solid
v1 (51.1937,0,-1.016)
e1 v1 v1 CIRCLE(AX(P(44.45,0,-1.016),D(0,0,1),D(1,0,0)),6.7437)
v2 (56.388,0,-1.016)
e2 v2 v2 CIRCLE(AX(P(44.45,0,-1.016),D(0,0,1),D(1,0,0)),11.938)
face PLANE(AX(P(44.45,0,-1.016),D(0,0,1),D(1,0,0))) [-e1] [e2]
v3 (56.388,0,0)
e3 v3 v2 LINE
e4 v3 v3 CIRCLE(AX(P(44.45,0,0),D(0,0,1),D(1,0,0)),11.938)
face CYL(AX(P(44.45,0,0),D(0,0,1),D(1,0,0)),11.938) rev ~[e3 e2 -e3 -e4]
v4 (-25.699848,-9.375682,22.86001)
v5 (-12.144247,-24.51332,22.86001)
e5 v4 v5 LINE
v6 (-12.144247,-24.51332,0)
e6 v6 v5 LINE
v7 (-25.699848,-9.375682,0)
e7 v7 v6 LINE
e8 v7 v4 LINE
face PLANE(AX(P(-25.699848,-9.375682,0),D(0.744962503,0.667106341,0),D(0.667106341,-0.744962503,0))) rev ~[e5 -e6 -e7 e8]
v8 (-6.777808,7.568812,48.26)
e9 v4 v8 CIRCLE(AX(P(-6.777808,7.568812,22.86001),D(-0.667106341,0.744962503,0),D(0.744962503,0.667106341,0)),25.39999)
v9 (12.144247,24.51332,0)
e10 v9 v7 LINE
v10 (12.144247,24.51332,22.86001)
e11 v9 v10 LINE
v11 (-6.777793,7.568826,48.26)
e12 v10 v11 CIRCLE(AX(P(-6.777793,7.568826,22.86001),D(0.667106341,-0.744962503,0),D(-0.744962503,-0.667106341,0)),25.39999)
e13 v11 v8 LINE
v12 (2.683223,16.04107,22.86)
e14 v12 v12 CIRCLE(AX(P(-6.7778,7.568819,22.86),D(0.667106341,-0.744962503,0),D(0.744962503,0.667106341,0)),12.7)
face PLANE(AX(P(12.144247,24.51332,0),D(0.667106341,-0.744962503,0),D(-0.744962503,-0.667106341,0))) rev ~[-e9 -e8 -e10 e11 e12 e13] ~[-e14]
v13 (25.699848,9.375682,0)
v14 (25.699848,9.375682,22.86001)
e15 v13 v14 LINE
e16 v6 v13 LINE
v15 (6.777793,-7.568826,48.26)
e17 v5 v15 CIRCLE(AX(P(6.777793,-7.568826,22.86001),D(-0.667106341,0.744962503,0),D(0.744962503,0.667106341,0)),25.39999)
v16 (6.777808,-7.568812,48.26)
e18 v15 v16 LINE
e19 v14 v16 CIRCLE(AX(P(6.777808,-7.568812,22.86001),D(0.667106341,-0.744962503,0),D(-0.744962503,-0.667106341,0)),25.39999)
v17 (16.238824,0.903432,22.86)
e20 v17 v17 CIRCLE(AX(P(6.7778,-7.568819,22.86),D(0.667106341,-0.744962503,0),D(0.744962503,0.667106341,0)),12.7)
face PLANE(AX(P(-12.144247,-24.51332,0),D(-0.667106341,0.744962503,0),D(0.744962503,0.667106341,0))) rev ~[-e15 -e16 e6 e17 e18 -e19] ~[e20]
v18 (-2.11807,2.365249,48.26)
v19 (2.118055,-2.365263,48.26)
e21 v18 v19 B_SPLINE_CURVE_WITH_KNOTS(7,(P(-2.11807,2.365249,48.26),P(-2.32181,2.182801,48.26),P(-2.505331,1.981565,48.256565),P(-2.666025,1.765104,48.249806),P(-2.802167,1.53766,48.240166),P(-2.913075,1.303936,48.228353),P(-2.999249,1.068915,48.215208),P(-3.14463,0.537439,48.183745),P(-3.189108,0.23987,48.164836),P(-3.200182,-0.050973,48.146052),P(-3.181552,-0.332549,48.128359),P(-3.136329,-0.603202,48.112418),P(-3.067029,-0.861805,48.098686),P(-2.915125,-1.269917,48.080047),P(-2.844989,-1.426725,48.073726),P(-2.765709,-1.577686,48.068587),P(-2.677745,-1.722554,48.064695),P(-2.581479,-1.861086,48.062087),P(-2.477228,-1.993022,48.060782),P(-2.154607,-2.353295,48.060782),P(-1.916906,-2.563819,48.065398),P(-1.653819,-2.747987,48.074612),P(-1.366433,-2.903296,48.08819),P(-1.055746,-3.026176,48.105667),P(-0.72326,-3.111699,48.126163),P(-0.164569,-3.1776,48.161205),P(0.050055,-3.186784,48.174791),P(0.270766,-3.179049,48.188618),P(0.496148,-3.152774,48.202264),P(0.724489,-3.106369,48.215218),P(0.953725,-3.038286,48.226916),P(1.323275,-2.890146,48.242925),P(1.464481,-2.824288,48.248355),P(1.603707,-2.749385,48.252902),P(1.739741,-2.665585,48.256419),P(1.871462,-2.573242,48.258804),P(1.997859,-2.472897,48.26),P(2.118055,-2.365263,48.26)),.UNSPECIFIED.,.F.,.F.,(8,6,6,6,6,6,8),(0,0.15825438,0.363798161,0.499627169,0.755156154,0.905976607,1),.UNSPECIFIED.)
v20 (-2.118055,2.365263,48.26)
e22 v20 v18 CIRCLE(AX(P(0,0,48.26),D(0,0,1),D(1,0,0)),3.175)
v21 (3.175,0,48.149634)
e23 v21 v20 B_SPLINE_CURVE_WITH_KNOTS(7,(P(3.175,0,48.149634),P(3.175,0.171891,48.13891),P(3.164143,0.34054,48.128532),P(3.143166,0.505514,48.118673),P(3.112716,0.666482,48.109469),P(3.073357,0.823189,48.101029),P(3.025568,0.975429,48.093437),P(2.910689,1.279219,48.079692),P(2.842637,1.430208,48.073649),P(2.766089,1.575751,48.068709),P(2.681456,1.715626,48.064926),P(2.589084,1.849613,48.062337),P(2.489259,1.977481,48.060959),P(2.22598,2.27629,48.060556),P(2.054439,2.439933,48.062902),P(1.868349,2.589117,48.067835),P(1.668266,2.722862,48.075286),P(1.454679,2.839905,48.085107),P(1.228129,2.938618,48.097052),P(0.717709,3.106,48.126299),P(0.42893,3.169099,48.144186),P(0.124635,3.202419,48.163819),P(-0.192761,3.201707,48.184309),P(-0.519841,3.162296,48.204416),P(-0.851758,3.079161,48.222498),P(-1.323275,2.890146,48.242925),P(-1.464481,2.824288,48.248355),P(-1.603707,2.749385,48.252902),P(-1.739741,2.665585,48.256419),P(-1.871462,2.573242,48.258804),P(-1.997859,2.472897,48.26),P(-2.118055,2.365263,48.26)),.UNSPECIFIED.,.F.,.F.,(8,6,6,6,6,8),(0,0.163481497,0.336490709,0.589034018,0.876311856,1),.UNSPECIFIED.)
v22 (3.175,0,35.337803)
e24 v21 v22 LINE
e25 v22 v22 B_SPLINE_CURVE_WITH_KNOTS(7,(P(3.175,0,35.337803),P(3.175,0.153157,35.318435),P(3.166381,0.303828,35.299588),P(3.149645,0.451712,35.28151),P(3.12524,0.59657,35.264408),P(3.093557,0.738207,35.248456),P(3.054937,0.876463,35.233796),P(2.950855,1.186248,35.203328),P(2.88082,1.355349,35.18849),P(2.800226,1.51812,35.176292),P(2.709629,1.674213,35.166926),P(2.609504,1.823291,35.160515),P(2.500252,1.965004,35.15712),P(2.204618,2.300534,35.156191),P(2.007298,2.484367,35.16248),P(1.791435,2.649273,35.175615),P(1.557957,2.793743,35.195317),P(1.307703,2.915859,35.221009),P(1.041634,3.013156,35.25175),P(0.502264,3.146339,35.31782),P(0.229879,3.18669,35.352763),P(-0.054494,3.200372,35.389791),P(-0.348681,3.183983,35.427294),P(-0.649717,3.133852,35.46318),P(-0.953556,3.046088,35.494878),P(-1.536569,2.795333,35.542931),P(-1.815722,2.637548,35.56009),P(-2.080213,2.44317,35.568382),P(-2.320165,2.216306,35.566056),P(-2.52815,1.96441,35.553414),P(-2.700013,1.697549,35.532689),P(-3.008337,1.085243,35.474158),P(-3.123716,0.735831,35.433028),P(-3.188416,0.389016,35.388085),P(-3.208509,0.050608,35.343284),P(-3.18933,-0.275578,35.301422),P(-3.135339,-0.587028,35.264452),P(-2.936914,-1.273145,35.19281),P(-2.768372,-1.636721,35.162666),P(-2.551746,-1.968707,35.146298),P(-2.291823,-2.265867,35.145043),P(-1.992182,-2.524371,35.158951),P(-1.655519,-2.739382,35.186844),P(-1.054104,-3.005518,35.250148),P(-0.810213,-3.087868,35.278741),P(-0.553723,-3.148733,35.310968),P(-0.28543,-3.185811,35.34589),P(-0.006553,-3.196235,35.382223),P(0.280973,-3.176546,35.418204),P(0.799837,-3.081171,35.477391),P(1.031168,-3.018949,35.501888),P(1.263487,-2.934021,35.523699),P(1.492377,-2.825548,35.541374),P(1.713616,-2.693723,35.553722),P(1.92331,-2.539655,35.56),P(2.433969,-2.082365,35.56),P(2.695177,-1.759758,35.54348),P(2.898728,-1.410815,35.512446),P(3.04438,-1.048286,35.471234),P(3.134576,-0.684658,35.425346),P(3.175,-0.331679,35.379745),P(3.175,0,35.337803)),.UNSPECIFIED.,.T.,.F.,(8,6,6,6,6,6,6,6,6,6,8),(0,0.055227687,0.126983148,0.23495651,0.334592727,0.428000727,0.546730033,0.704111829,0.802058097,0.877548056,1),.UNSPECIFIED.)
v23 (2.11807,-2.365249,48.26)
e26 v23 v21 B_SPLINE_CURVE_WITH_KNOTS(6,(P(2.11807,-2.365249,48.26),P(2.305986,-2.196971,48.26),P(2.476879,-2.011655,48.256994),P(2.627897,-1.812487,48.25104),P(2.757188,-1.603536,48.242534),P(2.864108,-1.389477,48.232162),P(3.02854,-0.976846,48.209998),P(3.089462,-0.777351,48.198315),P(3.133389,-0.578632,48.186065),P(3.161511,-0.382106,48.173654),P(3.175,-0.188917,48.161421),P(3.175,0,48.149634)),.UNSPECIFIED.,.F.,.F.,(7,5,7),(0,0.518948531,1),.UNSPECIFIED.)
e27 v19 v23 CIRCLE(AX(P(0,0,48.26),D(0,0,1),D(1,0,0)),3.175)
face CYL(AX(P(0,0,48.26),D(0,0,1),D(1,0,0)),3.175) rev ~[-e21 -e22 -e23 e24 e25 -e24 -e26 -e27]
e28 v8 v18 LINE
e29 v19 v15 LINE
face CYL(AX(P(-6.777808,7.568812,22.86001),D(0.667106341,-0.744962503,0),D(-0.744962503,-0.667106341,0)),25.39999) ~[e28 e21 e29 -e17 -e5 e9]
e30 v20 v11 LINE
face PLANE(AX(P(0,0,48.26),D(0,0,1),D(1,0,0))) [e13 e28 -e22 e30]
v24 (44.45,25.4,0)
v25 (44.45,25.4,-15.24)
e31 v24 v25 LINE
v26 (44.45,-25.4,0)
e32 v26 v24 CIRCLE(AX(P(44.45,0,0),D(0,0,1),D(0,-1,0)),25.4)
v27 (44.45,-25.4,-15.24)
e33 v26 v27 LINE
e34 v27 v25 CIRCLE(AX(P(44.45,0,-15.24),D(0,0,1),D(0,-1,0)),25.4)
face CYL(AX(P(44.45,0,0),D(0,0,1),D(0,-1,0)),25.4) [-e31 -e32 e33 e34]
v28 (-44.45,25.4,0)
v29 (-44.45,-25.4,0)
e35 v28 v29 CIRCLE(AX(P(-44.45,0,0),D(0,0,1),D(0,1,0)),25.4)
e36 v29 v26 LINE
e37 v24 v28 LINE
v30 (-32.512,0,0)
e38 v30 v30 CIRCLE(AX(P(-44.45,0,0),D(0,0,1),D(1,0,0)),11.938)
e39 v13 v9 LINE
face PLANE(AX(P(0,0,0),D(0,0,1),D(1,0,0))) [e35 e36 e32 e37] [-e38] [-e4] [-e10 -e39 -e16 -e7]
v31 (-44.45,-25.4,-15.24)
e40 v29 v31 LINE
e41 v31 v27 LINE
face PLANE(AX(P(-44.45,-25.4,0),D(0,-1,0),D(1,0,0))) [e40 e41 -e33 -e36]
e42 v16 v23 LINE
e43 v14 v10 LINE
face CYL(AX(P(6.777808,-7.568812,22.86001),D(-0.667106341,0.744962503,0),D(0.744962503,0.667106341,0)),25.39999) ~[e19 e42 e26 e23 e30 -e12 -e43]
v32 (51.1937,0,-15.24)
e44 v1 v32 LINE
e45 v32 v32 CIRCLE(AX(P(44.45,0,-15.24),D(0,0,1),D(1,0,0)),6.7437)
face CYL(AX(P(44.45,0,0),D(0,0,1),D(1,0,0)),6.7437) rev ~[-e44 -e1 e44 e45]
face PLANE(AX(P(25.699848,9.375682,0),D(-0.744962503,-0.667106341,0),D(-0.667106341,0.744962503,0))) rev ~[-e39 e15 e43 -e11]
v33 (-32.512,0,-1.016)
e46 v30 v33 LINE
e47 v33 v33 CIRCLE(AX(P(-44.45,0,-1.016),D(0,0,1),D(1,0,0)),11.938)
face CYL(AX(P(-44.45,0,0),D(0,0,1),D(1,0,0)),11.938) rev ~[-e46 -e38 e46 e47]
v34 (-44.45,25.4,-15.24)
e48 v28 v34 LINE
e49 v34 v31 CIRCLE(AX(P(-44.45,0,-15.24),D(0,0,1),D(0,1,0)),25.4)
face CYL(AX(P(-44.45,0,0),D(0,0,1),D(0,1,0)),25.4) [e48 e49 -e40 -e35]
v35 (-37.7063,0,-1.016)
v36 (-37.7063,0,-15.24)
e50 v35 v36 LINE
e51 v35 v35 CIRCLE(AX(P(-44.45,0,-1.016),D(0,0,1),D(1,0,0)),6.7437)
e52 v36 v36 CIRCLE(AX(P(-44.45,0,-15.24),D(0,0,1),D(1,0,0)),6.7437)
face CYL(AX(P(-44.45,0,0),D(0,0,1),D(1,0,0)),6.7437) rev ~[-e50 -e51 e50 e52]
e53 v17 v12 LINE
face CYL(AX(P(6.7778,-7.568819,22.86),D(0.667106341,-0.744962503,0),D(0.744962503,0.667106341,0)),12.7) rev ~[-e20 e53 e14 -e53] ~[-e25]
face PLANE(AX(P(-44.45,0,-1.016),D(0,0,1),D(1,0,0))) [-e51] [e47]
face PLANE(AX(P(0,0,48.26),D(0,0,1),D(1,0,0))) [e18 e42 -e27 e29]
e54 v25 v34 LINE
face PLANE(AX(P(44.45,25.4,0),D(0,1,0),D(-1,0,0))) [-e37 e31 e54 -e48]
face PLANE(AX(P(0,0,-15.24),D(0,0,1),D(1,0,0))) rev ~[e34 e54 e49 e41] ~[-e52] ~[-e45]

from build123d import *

# Parameters (mm, degrees)
F0_R     = 11.938
F0_R_2   = 6.7437
F1_DEPTH = 15.24
F2_DEPTH = 1.016
F4_DEPTH = 48.26
F5_R     = 25.39999
F6_R     = 12.7
F7_DEPTH = 25.4
F8_R     = 3.175
F9_DEPTH = 13.1042779754


# Not quite as in the source:
# - a fillet or chamfer is up to 0.001 mm smaller than in the source, because OpenCascade refuses the exact size
# - a feature names something its author has since deleted; it is built from what else it names


with BuildPart() as f1:
    # F0 (on Top) → F1 (new body)
    with BuildSketch(Plane.XY):
        with BuildLine():
            Line((44.45, 25.4), (-44.45, 25.4))
            ThreePointArc((-44.45, 25.4), (-69.85, 0), (-44.45, -25.4))
            Line((-44.45, -25.4), (44.45, -25.4))
            ThreePointArc((44.45, -25.4), (69.85, 0), (44.45, 25.4))
        make_face()
        with Locations((-44.45, 0)):
            Circle(F0_R, mode=Mode.SUBTRACT)
        Polygon((-12.1442471439, -24.5133200793), (-25.6998479864, -9.3756820272), (12.1442471439, 24.5133200793), (25.6998479864, 9.3756820272), align=None, mode=Mode.SUBTRACT)
        with Locations((44.45, 0)):
            Circle(F0_R, mode=Mode.SUBTRACT)
        with Locations((-44.45, 0)):
            Circle(F0_R)
        with Locations((-44.45, 0)):
            Circle(F0_R_2, mode=Mode.SUBTRACT)
        with Locations((44.45, 0)):
            Circle(F0_R)
        with Locations((44.45, 0)):
            Circle(F0_R_2, mode=Mode.SUBTRACT)
        Polygon((12.1442471439, 24.5133200793), (-25.6998479864, -9.3756820272), (-12.1442471439, -24.5133200793), (25.6998479864, 9.3756820272), align=None)
    extrude(amount=-F1_DEPTH)

    # F0 (on Top) → F2 (cut)
    with BuildSketch(Plane.XY):
        with Locations((-44.45, 0)):
            Circle(F0_R)
        with Locations((-44.45, 0)):
            Circle(F0_R_2, mode=Mode.SUBTRACT)
        with Locations((44.45, 0)):
            Circle(F0_R)
        with Locations((44.45, 0)):
            Circle(F0_R_2, mode=Mode.SUBTRACT)
    extrude(amount=-F2_DEPTH, mode=Mode.SUBTRACT)

    # F0 (on Top) → F4 (join)
    with BuildSketch(Plane.XY):
        Polygon((12.1442471439, 24.5133200793), (-25.6998479864, -9.3756820272), (-12.1442471439, -24.5133200793), (25.6998479864, 9.3756820272), align=None)
    extrude(amount=F4_DEPTH)

    # F5 (radius 25.4 in the source; OpenCascade refuses exactly that, so slightly less here)
    f5_edges = [f1.edges().sort_by_distance(p)[0] for p in [
        (-18.922048, -16.944501, 48.26),
        (18.922048, 16.944501, 48.26),
    ]]
    fillet(f5_edges, radius=F5_R)

    # F6 (on face) → F7 (cut)
    with BuildSketch(Plane(origin=(6.7778004213, -7.5688190261, 0), x_dir=(0.7449625026, 0.6671063407, 0), z_dir=(0.6671063407, -0.7449625026, 0))):
        with Locations((0, 22.86)):
            Circle(F6_R)
    extrude(amount=-F7_DEPTH, mode=Mode.SUBTRACT)

    # F8 (on offset) → F9 (cut, through all)
    with BuildSketch(Plane.XY.offset(48.26)):
        Circle(F8_R)
    extrude(amount=-F9_DEPTH, mode=Mode.SUBTRACT)


solid = f1.part
